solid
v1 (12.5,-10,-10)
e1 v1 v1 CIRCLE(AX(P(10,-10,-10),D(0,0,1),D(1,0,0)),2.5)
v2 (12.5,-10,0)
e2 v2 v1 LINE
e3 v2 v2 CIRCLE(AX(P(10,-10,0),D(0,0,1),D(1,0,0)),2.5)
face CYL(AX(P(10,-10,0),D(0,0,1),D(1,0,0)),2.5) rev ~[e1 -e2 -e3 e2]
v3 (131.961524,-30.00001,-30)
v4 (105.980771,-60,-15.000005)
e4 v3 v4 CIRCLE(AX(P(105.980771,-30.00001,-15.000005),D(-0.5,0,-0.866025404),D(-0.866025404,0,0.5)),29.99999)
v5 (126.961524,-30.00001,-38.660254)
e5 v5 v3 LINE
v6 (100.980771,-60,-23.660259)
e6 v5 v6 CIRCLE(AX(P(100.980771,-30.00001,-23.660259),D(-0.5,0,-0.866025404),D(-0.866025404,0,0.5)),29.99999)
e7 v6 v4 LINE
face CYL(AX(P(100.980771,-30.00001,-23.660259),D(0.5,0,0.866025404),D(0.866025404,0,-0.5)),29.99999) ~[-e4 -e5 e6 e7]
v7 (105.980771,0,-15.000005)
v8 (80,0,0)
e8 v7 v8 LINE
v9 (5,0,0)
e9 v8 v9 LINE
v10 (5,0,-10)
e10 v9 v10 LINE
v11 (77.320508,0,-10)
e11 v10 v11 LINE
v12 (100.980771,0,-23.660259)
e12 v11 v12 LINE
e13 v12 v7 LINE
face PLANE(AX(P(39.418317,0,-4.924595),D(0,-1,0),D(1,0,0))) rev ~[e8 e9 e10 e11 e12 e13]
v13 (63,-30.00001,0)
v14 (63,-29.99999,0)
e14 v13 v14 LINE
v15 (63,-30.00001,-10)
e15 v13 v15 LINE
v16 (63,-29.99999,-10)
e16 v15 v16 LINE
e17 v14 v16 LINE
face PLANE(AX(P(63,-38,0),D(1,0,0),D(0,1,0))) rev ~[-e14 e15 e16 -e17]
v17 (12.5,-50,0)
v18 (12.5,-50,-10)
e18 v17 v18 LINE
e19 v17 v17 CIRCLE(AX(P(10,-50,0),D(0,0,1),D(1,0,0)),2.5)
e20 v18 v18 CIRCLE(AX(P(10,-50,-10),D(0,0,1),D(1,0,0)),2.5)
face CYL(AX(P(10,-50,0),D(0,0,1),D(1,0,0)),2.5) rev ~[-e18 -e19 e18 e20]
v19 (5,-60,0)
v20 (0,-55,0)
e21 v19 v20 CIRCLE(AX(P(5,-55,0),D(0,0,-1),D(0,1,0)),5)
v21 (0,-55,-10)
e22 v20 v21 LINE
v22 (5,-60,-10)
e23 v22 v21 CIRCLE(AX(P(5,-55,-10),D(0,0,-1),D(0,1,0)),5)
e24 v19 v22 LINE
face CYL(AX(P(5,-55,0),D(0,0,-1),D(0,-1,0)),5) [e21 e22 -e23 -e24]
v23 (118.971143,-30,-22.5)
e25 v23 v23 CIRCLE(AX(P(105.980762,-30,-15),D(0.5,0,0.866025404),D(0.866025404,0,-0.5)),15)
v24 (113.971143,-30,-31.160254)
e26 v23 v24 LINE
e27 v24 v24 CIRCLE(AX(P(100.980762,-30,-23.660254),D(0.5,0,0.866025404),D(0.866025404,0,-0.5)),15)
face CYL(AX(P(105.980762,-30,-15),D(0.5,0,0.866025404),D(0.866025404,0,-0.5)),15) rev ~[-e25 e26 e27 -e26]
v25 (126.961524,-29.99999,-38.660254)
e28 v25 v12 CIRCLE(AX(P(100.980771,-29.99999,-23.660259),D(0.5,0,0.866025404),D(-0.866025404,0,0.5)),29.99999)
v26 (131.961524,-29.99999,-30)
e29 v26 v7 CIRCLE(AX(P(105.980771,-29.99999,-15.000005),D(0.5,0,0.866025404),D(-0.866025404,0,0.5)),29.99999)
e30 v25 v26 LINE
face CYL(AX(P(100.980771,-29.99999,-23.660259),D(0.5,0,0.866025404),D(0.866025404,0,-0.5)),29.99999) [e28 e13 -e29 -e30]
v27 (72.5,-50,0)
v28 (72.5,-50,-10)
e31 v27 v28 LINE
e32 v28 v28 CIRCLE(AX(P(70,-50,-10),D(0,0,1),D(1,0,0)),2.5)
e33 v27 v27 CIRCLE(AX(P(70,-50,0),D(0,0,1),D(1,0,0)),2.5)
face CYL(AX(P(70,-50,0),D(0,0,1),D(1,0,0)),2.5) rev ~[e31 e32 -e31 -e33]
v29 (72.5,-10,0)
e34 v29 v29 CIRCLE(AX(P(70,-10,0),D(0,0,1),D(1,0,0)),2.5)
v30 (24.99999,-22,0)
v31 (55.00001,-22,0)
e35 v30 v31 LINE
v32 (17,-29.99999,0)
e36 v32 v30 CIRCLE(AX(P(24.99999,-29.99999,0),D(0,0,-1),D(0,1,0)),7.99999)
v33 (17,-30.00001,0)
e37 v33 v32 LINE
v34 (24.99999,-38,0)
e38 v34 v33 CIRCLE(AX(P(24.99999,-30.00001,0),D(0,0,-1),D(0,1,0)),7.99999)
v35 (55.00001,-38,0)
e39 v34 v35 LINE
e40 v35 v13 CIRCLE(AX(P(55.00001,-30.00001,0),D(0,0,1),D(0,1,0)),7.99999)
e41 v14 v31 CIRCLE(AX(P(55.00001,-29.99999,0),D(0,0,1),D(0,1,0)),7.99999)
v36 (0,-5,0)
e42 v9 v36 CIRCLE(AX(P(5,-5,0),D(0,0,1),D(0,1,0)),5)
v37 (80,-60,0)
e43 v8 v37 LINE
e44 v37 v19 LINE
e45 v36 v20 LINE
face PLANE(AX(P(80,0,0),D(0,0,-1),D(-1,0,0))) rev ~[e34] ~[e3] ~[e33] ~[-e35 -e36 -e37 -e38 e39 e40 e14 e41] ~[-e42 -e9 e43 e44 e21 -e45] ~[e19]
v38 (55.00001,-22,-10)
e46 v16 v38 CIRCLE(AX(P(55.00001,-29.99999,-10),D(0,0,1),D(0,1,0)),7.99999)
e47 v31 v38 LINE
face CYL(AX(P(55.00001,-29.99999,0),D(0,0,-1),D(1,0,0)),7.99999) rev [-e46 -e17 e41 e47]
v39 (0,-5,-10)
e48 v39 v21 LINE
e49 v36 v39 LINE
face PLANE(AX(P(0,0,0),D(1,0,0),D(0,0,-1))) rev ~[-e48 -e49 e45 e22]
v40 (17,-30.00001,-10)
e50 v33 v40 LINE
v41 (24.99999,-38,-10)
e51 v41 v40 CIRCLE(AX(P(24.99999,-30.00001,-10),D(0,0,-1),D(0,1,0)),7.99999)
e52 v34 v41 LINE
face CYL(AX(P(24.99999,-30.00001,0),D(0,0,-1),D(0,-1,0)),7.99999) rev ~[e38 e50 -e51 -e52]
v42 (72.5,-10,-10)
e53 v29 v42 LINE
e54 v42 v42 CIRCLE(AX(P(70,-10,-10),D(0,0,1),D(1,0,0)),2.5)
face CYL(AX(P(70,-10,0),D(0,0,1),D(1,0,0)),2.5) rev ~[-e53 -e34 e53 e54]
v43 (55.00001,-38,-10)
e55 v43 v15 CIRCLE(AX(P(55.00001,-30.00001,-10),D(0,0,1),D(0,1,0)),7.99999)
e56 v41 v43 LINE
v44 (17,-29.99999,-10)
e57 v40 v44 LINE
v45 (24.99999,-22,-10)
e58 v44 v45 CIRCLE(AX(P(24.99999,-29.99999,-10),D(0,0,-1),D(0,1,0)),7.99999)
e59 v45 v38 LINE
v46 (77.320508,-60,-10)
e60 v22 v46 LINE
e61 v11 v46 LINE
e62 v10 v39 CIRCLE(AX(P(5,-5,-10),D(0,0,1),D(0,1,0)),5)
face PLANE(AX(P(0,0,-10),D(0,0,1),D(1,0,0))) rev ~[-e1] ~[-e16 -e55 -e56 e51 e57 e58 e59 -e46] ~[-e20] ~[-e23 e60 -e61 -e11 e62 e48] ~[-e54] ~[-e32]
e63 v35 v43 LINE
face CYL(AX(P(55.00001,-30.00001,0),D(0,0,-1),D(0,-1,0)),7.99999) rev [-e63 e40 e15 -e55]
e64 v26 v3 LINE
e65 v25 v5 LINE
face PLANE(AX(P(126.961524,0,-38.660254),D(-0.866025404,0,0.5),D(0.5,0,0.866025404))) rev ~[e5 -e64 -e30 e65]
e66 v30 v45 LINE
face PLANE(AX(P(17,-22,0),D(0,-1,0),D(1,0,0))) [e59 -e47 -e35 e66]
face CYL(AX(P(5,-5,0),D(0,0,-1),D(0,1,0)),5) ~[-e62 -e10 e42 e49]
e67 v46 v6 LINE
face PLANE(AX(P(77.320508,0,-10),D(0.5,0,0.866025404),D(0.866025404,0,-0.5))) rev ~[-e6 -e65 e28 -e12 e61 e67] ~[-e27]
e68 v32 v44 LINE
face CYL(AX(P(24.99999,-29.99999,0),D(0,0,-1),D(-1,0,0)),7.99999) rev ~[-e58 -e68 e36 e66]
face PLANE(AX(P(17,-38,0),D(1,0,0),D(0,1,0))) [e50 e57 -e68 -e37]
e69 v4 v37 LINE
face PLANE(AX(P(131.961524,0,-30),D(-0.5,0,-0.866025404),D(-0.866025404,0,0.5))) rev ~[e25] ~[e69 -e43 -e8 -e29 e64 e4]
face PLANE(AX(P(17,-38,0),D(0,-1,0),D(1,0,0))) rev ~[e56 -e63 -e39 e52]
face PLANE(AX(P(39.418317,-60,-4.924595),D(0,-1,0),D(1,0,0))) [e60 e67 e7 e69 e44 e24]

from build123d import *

# Parameters (mm, degrees)
F1_DEPTH = 60
F2_R     = 29.99999
F3_R     = 15
F4_DEPTH = 25
F5_R     = 5
F6_W     = 46
F6_H     = 16
F7_DEPTH = 25
F6_R     = 2.5
F8_DEPTH = 25
F9_R     = 7.99999


# Not quite as in the source:
# - a fillet or chamfer is up to 0.001 mm smaller than in the source, because OpenCascade refuses the exact size


with BuildPart() as f1:
    # F0 (on Front) → F1 (new body)
    with BuildSketch(Plane.XZ):
        Polygon((80, 0), (0, 0), (0, -10), (77.3205080757, -10), align=None)
        Polygon((131.9615242271, -30), (80, 0), (77.3205080757, -10), (126.9615242271, -38.6602540378), align=None)
    extrude(amount=F1_DEPTH)

    # F2 (radius 30 in the source; OpenCascade refuses exactly that, so slightly less here)
    f2_edges = [f1.edges().sort_by_distance(p)[0] for p in [
        (129.461524, 0, -34.330127),
        (129.461524, -60, -34.330127),
    ]]
    fillet(f2_edges, radius=F2_R)

    # F3 (on face) → F4 (cut)
    with BuildSketch(Plane(origin=(20, 0, 34.6410161514), x_dir=(0.8660254038, 0, -0.5), z_dir=(0.5, 0, 0.8660254038))):
        with Locations((99.2820323028, -30)):
            Circle(F3_R)
    extrude(amount=-F4_DEPTH, mode=Mode.SUBTRACT)

    # F5
    f5_edges = [f1.edges().sort_by_distance(p)[0] for p in [
        (0, 0, -5),
        (0, -60, -5),
    ]]
    fillet(f5_edges, radius=F5_R)

    # F6 (on face) → F7 (cut)
    with BuildSketch(Plane.XY):
        with Locations((40, -30)):
            Rectangle(F6_W, F6_H)
    extrude(amount=-F7_DEPTH, mode=Mode.SUBTRACT)

    # F6 (on face) → F8 (cut)
    with BuildSketch(Plane.XY):
        with Locations((10, -50)):
            Circle(F6_R)
        with Locations((70, -50)):
            Circle(F6_R)
        with Locations((70, -10)):
            Circle(F6_R)
        with Locations((10, -10)):
            Circle(F6_R)
        with Locations((40, -30)):
            Rectangle(F6_W, F6_H)
    extrude(amount=-F8_DEPTH, mode=Mode.SUBTRACT)

    # F9 (radius 8 in the source; OpenCascade refuses exactly that, so slightly less here)
    f9_edges = [f1.edges().sort_by_distance(p)[0] for p in [
        (63, -22, -5),
        (63, -38, -5),
        (17, -22, -5),
        (17, -38, -5),
    ]]
    fillet(f9_edges, radius=F9_R)


solid = f1.part
